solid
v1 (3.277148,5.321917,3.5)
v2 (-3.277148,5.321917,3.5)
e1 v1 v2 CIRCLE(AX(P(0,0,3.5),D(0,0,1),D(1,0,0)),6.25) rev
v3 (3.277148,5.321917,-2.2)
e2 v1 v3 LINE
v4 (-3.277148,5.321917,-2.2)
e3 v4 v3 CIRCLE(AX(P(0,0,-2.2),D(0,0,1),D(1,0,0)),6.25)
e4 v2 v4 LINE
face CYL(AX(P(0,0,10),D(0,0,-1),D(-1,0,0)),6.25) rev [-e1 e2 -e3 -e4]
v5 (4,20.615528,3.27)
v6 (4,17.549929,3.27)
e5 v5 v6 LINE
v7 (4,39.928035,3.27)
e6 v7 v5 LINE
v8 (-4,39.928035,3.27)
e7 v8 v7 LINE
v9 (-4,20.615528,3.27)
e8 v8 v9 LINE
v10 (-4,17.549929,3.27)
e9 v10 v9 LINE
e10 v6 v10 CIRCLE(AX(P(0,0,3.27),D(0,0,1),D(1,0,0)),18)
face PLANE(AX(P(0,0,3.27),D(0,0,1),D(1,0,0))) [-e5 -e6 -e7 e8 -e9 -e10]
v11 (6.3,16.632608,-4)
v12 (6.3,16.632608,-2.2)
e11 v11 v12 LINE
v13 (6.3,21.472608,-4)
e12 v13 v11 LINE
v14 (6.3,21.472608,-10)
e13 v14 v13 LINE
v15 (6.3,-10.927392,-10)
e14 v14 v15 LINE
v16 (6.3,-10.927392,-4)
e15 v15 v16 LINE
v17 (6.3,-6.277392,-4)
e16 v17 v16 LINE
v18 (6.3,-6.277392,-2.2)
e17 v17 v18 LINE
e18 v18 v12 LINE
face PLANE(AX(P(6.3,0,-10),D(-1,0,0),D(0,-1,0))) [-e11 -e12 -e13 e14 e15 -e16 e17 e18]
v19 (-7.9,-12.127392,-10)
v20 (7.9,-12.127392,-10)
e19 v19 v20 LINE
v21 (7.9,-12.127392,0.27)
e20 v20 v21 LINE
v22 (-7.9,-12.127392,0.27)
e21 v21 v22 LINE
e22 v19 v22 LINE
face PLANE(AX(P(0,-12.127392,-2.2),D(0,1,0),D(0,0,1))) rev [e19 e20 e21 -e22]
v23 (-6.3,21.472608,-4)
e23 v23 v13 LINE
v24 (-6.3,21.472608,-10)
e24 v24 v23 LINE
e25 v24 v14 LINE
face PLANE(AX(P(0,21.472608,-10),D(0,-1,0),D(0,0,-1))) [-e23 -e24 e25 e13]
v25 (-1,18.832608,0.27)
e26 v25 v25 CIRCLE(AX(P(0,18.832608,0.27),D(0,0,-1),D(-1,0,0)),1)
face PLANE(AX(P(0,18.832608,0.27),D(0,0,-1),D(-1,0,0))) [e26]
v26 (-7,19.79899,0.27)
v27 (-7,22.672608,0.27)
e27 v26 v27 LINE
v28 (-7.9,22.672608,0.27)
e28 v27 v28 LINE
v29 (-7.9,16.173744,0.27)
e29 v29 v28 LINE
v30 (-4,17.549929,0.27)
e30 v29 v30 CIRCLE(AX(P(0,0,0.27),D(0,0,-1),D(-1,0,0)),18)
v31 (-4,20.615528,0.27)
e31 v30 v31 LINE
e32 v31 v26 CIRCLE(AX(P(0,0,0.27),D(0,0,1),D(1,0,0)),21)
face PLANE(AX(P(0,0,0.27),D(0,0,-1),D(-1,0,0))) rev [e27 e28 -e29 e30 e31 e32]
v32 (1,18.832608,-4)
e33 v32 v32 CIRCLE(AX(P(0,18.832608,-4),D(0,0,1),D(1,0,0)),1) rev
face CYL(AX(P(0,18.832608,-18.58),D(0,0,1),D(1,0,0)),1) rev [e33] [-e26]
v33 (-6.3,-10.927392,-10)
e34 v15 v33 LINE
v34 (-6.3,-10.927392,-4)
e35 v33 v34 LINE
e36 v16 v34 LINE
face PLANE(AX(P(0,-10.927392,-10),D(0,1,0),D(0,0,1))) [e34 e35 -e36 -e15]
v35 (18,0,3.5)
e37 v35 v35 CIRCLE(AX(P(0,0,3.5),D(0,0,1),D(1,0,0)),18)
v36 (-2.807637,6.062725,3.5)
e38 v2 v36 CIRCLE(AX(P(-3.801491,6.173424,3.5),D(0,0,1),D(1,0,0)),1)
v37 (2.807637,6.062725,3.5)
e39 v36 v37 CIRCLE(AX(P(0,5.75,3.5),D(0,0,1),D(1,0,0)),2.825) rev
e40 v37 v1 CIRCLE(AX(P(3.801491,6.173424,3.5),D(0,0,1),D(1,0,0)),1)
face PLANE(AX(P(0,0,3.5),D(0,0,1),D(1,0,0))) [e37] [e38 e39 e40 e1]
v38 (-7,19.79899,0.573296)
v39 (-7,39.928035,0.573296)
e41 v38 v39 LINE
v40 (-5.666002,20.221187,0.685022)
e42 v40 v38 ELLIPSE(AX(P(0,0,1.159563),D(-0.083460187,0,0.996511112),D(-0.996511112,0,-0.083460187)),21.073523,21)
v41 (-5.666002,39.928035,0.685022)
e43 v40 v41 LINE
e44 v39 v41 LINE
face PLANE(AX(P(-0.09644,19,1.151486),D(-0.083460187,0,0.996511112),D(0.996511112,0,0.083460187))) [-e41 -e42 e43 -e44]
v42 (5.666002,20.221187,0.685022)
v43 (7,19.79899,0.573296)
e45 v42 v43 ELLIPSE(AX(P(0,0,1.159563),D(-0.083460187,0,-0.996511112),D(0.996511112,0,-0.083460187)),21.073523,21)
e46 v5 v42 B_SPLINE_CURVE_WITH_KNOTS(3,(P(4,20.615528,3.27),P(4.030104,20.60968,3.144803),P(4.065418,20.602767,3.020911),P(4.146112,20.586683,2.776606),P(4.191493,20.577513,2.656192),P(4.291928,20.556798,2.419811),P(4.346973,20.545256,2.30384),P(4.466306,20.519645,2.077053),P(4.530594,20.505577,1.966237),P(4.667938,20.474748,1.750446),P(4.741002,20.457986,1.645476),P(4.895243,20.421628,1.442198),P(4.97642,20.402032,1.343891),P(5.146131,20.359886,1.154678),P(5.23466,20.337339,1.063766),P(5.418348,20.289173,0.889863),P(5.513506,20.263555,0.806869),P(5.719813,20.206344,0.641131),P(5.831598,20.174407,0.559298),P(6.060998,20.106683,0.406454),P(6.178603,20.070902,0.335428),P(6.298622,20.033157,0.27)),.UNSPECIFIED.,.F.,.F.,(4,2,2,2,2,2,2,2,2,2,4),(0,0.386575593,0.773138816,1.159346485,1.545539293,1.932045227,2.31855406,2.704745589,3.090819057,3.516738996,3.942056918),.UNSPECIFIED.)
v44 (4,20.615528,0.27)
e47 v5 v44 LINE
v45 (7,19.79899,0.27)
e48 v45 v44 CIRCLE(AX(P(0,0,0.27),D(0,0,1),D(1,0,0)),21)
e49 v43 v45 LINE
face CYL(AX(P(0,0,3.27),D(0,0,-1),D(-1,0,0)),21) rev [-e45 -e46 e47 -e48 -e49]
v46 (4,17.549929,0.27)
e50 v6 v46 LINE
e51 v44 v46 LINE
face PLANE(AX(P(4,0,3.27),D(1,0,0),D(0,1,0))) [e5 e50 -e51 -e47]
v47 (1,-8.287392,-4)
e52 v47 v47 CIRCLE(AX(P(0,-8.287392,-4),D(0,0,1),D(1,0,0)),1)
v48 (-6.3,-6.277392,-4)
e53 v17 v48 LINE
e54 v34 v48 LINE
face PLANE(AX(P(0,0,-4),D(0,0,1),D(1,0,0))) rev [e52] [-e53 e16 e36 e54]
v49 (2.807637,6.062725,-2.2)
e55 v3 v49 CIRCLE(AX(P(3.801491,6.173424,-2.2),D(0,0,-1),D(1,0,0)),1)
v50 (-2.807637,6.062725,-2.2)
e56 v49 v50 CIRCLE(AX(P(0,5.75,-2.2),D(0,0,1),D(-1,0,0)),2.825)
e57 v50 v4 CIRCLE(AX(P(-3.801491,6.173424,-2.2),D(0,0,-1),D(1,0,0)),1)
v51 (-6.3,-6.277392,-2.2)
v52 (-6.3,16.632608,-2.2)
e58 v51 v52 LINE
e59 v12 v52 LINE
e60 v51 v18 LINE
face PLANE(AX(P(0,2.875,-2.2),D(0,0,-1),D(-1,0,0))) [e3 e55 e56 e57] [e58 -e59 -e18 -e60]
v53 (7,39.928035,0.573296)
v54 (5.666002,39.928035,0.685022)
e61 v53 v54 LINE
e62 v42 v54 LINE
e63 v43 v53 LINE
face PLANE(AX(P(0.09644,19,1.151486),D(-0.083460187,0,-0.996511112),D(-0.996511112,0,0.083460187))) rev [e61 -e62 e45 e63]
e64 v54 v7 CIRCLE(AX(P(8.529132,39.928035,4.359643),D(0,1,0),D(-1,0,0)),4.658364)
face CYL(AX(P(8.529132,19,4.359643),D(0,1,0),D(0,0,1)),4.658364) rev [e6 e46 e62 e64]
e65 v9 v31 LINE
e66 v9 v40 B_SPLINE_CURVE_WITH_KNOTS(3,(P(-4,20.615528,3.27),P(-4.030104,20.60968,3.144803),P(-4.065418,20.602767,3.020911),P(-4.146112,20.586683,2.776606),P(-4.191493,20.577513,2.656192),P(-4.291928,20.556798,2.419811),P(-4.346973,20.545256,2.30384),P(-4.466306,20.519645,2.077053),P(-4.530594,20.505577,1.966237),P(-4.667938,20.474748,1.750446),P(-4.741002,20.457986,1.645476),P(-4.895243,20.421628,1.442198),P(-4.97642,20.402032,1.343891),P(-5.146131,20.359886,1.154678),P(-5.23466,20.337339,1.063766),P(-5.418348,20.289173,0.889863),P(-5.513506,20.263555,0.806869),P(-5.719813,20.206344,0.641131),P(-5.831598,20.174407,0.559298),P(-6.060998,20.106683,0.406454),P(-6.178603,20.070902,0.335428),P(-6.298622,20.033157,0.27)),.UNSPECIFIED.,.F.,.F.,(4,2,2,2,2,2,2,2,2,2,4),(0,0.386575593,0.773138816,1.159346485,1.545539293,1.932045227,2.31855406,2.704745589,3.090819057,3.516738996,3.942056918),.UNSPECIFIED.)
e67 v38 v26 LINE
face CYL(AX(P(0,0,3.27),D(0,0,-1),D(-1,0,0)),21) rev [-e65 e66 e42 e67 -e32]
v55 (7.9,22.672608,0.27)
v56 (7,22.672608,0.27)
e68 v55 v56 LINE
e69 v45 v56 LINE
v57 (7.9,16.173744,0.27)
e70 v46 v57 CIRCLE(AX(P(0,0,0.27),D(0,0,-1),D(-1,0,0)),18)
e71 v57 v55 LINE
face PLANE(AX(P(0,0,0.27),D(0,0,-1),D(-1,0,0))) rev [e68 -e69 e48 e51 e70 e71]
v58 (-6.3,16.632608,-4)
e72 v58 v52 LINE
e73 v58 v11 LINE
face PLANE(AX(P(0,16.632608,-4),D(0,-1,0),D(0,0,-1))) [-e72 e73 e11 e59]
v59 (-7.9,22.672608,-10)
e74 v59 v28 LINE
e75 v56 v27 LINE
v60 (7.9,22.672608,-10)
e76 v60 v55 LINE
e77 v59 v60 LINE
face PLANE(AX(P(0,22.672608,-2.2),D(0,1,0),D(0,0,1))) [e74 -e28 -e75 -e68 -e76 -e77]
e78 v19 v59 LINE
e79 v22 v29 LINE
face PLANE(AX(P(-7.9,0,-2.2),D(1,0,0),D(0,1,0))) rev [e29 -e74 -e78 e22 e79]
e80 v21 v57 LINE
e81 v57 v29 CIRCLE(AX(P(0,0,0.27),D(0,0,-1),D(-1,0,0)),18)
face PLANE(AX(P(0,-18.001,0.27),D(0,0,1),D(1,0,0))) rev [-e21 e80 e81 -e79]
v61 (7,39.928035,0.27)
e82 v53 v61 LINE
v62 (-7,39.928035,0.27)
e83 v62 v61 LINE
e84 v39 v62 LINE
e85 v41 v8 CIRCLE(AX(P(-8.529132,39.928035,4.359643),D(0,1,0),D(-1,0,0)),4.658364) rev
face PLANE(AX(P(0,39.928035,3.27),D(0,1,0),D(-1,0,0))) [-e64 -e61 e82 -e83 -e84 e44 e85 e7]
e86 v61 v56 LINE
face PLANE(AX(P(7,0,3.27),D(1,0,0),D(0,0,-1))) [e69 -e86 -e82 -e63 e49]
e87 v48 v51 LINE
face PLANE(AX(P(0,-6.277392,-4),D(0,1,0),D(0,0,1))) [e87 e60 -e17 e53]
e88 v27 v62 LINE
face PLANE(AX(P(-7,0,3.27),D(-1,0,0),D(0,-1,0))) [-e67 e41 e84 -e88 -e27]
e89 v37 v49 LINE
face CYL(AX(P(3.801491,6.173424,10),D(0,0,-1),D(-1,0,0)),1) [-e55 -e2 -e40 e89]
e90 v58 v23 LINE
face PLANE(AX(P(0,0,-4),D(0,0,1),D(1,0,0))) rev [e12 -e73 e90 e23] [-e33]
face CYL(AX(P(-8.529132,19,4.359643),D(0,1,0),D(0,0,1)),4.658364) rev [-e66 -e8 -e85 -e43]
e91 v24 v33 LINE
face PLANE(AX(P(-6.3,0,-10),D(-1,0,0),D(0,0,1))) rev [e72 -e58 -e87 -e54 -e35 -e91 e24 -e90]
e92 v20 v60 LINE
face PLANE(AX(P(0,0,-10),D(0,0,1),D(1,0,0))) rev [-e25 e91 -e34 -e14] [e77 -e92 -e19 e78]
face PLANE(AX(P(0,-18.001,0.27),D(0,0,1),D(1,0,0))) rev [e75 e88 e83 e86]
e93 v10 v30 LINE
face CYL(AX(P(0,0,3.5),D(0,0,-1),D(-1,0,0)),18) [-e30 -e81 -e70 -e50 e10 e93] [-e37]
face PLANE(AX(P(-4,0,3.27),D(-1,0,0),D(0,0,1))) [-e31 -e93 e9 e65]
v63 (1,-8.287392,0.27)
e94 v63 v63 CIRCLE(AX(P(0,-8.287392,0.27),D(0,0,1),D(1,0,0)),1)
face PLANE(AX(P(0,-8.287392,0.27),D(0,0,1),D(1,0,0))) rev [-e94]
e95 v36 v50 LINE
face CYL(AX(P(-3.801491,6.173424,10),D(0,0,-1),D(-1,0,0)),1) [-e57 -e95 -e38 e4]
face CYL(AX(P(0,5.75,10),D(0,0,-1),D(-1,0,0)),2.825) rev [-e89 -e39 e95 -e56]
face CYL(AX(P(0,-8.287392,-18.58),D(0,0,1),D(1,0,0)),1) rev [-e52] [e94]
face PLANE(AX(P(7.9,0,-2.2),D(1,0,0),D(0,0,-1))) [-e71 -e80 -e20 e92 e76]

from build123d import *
from build123d.topology import SkipClean

# Parameters (mm, degrees)
CROQUIS1_R                 = 18
SALIENTE_EXTRUIR1_DEPTH    = 3.5
SALIENTE_EXTRUIR5_DEPTH    = 3.27
CORTAR_EXTRUIR4_REACH      = 62.83
CORTAR_EXTRUIR4_END_RADIUS = 18
CROQUIS5_W                 = 14
CROQUIS5_H                 = 0.27
CORTAR_EXTRUIR2_DEPTH      = 21
CORTAR_EXTRUIR5_DEPTH      = 10
SALIENTE_EXTRUIR6_START    = -2.2
SALIENTE_EXTRUIR6_DEPTH    = 2.2
CORTAR_EXTRUIR8_START      = 0.27
CROQUIS8_R                 = 18
CORTAR_EXTRUIR8_DEPTH      = 0.27
SALIENTE_EXTRUIR7_START    = 2.47
SALIENTE_EXTRUIR7_DEPTH    = 2.47
SALIENTE_EXTRUIR9_DEPTH    = 10
CORTAR_EXTRUIR9_START      = 10
CORTAR_EXTRUIR9_DEPTH      = 10
CROQUIS13_W                = 12.6
CROQUIS13_H                = 4.84
CROQUIS13_H_2              = 4.65
SALIENTE_EXTRUIR10_DEPTH   = 4
CROQUIS12_R                = 1
CORTAR_EXTRUIR10_DEPTH     = 18.85


with BuildPart() as part:
    # Croquis1 → Saliente-Extruir1 (new body)
    with BuildSketch(Plane.XY):
        Circle(CROQUIS1_R)
    extrude(amount=SALIENTE_EXTRUIR1_DEPTH)

    # Croquis2 → Saliente-Extruir5 (add)
    with BuildSketch(Plane.XY):
        with BuildLine():
            Line((4, 39.111635425), (4, 20.615528128))
            ThreePointArc((4, 20.615528128), (5.515132245, 20.262855582), (7, 19.798989873))
            Line((7, 19.798989873), (7, 39.928035252))
            Line((7, 39.928035252), (4, 39.928035252))
            Line((4, 39.928035252), (4, 39.111635425))
        make_face()
        with BuildLine():
            Line((-4, 20.615528128), (-4, 17.549928775))
            ThreePointArc((-4, 17.549928775), (0, 18), (4, 17.549928775))
            Line((4, 17.549928775), (4, 20.615528128))
            ThreePointArc((4, 20.615528128), (0, 21), (-4, 20.615528128))
        make_face()
        with BuildLine():
            Line((-4, 39.111635425), (-4, 20.615528128))
            ThreePointArc((-4, 20.615528128), (0, 21), (4, 20.615528128))
            Line((4, 20.615528128), (4, 39.111635425))
            Line((4, 39.111635425), (4, 39.928035252))
            Line((4, 39.928035252), (-4, 39.928035252))
            Line((-4, 39.928035252), (-4, 39.111635425))
        make_face()
        with BuildLine():
            ThreePointArc((-7, 19.798989873), (-5.515132245, 20.262855582), (-4, 20.615528128))
            Line((-4, 20.615528128), (-4, 39.111635425))
            Line((-4, 39.111635425), (-4, 39.928035252))
            Line((-4, 39.928035252), (-7, 39.928035252))
            Line((-7, 39.928035252), (-7, 19.798989873))
        make_face()
    extrude(amount=SALIENTE_EXTRUIR5_DEPTH)

    # Cortar-Extruir4: up to this cylinder (the profile starts outside it)
    with SkipClean():  # the faces are left unmerged after this step: merging them gives an invalid solid
        cortar_extruir4_end = Plane(origin=(0, 0, 0.135), z_dir=(0, 0, -1)) * Cylinder(CORTAR_EXTRUIR4_END_RADIUS, 162.66, mode=Mode.PRIVATE)
        # Croquis5 → Cortar-Extruir4 (cut, up to the surface)
        with BuildSketch(Plane(origin=(0, 40, 0), x_dir=(1, 0, 0), z_dir=(0, 1, 0)), mode=Mode.PRIVATE) as cortar_extruir4_sk1:
            with Locations((0, -0.135)):
                Rectangle(CROQUIS5_W, CROQUIS5_H)
        cortar_extruir4_tool1 = extrude(cortar_extruir4_sk1.sketch, amount=-CORTAR_EXTRUIR4_REACH, mode=Mode.PRIVATE) - cortar_extruir4_end
        add(cortar_extruir4_tool1.solids().sort_by_distance((0, 40, 0.135))[0], mode=Mode.SUBTRACT)
    add(part.part.scale(1), mode=Mode.REPLACE)  # the faces are merged on a copy

    # Croquis4 → Cortar-Extruir2 (cut)
    with BuildSketch(Plane(origin=(0, 40, 0), x_dir=(1, 0, 0), z_dir=(0, 1, 0))):
        with BuildLine():
            Line((-5.666001987, -0.685021683), (-7, -0.573296162))
            Line((-7, -0.573296162), (-7, -3.27))
            Line((-7, -3.27), (-4, -3.27))
            ThreePointArc((-4, -3.27), (-4.613533351, -1.83606535), (-5.666001987, -0.685021683))
        make_face()
        with BuildLine():
            ThreePointArc((5.666001987, -0.685021683), (4.613533351, -1.83606535), (4, -3.27))
            Line((4, -3.27), (7, -3.27))
            Line((7, -3.27), (7, -0.573296162))
            Line((7, -0.573296162), (5.666001987, -0.685021683))
        make_face()
    extrude(amount=-CORTAR_EXTRUIR2_DEPTH, mode=Mode.SUBTRACT)

    # Croquis6 → Cortar-Extruir5 (cut)
    with BuildSketch(Plane.XY):
        with BuildLine():
            ThreePointArc((-3.277147796, 5.321917166), (0, -6.25), (3.277147796, 5.321917166))
            ThreePointArc((3.277147796, 5.321917166), (2.956843582, 5.638101589), (2.807637471, 6.062724851))
            ThreePointArc((2.807637471, 6.062724851), (0, 8.575), (-2.807637471, 6.062724851))
            ThreePointArc((-2.807637471, 6.062724851), (-2.956843582, 5.638101589), (-3.277147796, 5.321917166))
        make_face()
    extrude(amount=CORTAR_EXTRUIR5_DEPTH, mode=Mode.SUBTRACT)

    # Croquis7 → Saliente-Extruir6 (add)
    with SkipClean():  # the faces are left unmerged after this step: merging them gives an invalid solid
        with BuildSketch(Plane.XY.offset(SALIENTE_EXTRUIR6_START)):
            with BuildLine():
                ThreePointArc((-5.596720258, 7.364728261), (0, -9.25), (5.596720258, 7.364728261))
                ThreePointArc((5.596720258, 7.364728261), (0, 11.575), (-5.596720258, 7.364728261))
            make_face()
            with BuildLine():
                ThreePointArc((-3.277147796, 5.321917166), (0, -6.25), (3.277147796, 5.321917166))
                ThreePointArc((3.277147796, 5.321917166), (2.956843582, 5.638101589), (2.807637471, 6.062724851))
                ThreePointArc((2.807637471, 6.062724851), (0, 8.575), (-2.807637471, 6.062724851))
                ThreePointArc((-2.807637471, 6.062724851), (-2.956843582, 5.638101589), (-3.277147796, 5.321917166))
            make_face(mode=Mode.SUBTRACT)
        extrude(amount=SALIENTE_EXTRUIR6_DEPTH)

    # Croquis8 → Cortar-Extruir8 (cut)
    with BuildSketch(Plane(origin=(0, 0, 0.27), x_dir=(-1, 0, 0), z_dir=(0, 0, -1)).offset(CORTAR_EXTRUIR8_START)):
        with Locations(Location((0, 0, 0), (0, 0, 77.160411593))):
            Circle(CROQUIS8_R)
        with BuildLine():
            ThreePointArc((-5.596720258, 7.364728261), (0, -9.25), (5.596720258, 7.364728261))
            ThreePointArc((5.596720258, 7.364728261), (0, 11.575), (-5.596720258, 7.364728261))
        make_face(mode=Mode.SUBTRACT)
    extrude(amount=-CORTAR_EXTRUIR8_DEPTH, mode=Mode.SUBTRACT)

    # Croquis9 → Saliente-Extruir7 (add)
    with BuildSketch(Plane(origin=(0, 0, 0.27), x_dir=(-1, 0, 0), z_dir=(0, 0, -1)).offset(SALIENTE_EXTRUIR7_START)):
        with BuildLine():
            Line((-7.9, -4.81170448), (-7.9, -12.127391994))
            Line((-7.9, -12.127391994), (7.9, -12.127391994))
            Line((7.9, -12.127391994), (7.9, -4.81170448))
            ThreePointArc((7.9, -4.81170448), (0, -9.25), (-7.9, -4.81170448))
        make_face()
        with BuildLine():
            Line((-7.9, 22.672608006), (-7.9, 4.81170448))
            ThreePointArc((-7.9, 4.81170448), (-6.868030798, 6.196180514), (-5.596720258, 7.364728261))
            ThreePointArc((-5.596720258, 7.364728261), (0, 11.575), (5.596720258, 7.364728261))
            ThreePointArc((5.596720258, 7.364728261), (6.868030798, 6.196180514), (7.9, 4.81170448))
            Line((7.9, 4.81170448), (7.9, 22.672608006))
            Line((7.9, 22.672608006), (-7.9, 22.672608006))
        make_face()
    extrude(amount=-SALIENTE_EXTRUIR7_DEPTH)

    # Croquis10 → Saliente-Extruir9 (add)
    with BuildSketch(Plane.XY):
        Polygon((-7.9, -12.127391994), (0, -12.127391994), (7.9, -12.127391994), (7.9, -10.927391994), (7.9, 21.472608006), (7.9, 22.672608006), (-7.9, 22.672608006), (-7.9, 21.472608006), (-7.9, 5.272608006), (-7.9, -10.927391994), align=None)
        Polygon((-6.3, -6.277391994), (-6.3, 0), (-6.3, 5.272608006), (-6.3, 16.532608006), (-6.3, 19.872608006), (-6.3, 21.472608006), (6.3, 21.472608006), (6.3, 19.872608006), (6.3, 16.532608006), (6.3, -6.277391994), (6.3, -9.327391994), (6.3, -10.927391994), (0, -10.927391994), (-6.3, -10.927391994), (-6.3, -9.327391994), align=None, mode=Mode.SUBTRACT)
    extrude(amount=-SALIENTE_EXTRUIR9_DEPTH)

    # Croquis11 → Cortar-Extruir9 (cut)
    with BuildSketch(Plane(origin=(0, 0, 0.27), x_dir=(-1, 0, 0), z_dir=(0, 0, -1)).offset(CORTAR_EXTRUIR9_START)):
        with BuildLine():
            Line((7.9, 4.81170448), (7.9, -4.81170448))
            ThreePointArc((7.9, -4.81170448), (9.25, 0), (7.9, 4.81170448))
        make_face()
        with BuildLine():
            Line((-7.9, -4.81170448), (-7.9, 4.81170448))
            ThreePointArc((-7.9, 4.81170448), (-9.25, 0), (-7.9, -4.81170448))
        make_face()
    extrude(amount=-CORTAR_EXTRUIR9_DEPTH, mode=Mode.SUBTRACT)

    # Croquis13 → Saliente-Extruir10 (add)
    with BuildSketch(Plane.XY):
        with Locations((0, 19.052608006)):
            Rectangle(CROQUIS13_W, CROQUIS13_H)
        with Locations((0, -8.602391994)):
            Rectangle(CROQUIS13_W, CROQUIS13_H_2)
    extrude(amount=-SALIENTE_EXTRUIR10_DEPTH)

    # Croquis12 → Cortar-Extruir10 (cut)
    with BuildSketch(Plane(origin=(0, 0, 0.27), x_dir=(-1, 0, 0), z_dir=(0, 0, -1))):
        with Locations(Location((0, 18.832608006, 0), (0, 0, 180))):
            Circle(CROQUIS12_R)
        with Locations(Location((0, -8.287391994, 0), (0, 0, 180))):
            Circle(CROQUIS12_R)
    extrude(amount=CORTAR_EXTRUIR10_DEPTH, mode=Mode.SUBTRACT)


solid = part.part
